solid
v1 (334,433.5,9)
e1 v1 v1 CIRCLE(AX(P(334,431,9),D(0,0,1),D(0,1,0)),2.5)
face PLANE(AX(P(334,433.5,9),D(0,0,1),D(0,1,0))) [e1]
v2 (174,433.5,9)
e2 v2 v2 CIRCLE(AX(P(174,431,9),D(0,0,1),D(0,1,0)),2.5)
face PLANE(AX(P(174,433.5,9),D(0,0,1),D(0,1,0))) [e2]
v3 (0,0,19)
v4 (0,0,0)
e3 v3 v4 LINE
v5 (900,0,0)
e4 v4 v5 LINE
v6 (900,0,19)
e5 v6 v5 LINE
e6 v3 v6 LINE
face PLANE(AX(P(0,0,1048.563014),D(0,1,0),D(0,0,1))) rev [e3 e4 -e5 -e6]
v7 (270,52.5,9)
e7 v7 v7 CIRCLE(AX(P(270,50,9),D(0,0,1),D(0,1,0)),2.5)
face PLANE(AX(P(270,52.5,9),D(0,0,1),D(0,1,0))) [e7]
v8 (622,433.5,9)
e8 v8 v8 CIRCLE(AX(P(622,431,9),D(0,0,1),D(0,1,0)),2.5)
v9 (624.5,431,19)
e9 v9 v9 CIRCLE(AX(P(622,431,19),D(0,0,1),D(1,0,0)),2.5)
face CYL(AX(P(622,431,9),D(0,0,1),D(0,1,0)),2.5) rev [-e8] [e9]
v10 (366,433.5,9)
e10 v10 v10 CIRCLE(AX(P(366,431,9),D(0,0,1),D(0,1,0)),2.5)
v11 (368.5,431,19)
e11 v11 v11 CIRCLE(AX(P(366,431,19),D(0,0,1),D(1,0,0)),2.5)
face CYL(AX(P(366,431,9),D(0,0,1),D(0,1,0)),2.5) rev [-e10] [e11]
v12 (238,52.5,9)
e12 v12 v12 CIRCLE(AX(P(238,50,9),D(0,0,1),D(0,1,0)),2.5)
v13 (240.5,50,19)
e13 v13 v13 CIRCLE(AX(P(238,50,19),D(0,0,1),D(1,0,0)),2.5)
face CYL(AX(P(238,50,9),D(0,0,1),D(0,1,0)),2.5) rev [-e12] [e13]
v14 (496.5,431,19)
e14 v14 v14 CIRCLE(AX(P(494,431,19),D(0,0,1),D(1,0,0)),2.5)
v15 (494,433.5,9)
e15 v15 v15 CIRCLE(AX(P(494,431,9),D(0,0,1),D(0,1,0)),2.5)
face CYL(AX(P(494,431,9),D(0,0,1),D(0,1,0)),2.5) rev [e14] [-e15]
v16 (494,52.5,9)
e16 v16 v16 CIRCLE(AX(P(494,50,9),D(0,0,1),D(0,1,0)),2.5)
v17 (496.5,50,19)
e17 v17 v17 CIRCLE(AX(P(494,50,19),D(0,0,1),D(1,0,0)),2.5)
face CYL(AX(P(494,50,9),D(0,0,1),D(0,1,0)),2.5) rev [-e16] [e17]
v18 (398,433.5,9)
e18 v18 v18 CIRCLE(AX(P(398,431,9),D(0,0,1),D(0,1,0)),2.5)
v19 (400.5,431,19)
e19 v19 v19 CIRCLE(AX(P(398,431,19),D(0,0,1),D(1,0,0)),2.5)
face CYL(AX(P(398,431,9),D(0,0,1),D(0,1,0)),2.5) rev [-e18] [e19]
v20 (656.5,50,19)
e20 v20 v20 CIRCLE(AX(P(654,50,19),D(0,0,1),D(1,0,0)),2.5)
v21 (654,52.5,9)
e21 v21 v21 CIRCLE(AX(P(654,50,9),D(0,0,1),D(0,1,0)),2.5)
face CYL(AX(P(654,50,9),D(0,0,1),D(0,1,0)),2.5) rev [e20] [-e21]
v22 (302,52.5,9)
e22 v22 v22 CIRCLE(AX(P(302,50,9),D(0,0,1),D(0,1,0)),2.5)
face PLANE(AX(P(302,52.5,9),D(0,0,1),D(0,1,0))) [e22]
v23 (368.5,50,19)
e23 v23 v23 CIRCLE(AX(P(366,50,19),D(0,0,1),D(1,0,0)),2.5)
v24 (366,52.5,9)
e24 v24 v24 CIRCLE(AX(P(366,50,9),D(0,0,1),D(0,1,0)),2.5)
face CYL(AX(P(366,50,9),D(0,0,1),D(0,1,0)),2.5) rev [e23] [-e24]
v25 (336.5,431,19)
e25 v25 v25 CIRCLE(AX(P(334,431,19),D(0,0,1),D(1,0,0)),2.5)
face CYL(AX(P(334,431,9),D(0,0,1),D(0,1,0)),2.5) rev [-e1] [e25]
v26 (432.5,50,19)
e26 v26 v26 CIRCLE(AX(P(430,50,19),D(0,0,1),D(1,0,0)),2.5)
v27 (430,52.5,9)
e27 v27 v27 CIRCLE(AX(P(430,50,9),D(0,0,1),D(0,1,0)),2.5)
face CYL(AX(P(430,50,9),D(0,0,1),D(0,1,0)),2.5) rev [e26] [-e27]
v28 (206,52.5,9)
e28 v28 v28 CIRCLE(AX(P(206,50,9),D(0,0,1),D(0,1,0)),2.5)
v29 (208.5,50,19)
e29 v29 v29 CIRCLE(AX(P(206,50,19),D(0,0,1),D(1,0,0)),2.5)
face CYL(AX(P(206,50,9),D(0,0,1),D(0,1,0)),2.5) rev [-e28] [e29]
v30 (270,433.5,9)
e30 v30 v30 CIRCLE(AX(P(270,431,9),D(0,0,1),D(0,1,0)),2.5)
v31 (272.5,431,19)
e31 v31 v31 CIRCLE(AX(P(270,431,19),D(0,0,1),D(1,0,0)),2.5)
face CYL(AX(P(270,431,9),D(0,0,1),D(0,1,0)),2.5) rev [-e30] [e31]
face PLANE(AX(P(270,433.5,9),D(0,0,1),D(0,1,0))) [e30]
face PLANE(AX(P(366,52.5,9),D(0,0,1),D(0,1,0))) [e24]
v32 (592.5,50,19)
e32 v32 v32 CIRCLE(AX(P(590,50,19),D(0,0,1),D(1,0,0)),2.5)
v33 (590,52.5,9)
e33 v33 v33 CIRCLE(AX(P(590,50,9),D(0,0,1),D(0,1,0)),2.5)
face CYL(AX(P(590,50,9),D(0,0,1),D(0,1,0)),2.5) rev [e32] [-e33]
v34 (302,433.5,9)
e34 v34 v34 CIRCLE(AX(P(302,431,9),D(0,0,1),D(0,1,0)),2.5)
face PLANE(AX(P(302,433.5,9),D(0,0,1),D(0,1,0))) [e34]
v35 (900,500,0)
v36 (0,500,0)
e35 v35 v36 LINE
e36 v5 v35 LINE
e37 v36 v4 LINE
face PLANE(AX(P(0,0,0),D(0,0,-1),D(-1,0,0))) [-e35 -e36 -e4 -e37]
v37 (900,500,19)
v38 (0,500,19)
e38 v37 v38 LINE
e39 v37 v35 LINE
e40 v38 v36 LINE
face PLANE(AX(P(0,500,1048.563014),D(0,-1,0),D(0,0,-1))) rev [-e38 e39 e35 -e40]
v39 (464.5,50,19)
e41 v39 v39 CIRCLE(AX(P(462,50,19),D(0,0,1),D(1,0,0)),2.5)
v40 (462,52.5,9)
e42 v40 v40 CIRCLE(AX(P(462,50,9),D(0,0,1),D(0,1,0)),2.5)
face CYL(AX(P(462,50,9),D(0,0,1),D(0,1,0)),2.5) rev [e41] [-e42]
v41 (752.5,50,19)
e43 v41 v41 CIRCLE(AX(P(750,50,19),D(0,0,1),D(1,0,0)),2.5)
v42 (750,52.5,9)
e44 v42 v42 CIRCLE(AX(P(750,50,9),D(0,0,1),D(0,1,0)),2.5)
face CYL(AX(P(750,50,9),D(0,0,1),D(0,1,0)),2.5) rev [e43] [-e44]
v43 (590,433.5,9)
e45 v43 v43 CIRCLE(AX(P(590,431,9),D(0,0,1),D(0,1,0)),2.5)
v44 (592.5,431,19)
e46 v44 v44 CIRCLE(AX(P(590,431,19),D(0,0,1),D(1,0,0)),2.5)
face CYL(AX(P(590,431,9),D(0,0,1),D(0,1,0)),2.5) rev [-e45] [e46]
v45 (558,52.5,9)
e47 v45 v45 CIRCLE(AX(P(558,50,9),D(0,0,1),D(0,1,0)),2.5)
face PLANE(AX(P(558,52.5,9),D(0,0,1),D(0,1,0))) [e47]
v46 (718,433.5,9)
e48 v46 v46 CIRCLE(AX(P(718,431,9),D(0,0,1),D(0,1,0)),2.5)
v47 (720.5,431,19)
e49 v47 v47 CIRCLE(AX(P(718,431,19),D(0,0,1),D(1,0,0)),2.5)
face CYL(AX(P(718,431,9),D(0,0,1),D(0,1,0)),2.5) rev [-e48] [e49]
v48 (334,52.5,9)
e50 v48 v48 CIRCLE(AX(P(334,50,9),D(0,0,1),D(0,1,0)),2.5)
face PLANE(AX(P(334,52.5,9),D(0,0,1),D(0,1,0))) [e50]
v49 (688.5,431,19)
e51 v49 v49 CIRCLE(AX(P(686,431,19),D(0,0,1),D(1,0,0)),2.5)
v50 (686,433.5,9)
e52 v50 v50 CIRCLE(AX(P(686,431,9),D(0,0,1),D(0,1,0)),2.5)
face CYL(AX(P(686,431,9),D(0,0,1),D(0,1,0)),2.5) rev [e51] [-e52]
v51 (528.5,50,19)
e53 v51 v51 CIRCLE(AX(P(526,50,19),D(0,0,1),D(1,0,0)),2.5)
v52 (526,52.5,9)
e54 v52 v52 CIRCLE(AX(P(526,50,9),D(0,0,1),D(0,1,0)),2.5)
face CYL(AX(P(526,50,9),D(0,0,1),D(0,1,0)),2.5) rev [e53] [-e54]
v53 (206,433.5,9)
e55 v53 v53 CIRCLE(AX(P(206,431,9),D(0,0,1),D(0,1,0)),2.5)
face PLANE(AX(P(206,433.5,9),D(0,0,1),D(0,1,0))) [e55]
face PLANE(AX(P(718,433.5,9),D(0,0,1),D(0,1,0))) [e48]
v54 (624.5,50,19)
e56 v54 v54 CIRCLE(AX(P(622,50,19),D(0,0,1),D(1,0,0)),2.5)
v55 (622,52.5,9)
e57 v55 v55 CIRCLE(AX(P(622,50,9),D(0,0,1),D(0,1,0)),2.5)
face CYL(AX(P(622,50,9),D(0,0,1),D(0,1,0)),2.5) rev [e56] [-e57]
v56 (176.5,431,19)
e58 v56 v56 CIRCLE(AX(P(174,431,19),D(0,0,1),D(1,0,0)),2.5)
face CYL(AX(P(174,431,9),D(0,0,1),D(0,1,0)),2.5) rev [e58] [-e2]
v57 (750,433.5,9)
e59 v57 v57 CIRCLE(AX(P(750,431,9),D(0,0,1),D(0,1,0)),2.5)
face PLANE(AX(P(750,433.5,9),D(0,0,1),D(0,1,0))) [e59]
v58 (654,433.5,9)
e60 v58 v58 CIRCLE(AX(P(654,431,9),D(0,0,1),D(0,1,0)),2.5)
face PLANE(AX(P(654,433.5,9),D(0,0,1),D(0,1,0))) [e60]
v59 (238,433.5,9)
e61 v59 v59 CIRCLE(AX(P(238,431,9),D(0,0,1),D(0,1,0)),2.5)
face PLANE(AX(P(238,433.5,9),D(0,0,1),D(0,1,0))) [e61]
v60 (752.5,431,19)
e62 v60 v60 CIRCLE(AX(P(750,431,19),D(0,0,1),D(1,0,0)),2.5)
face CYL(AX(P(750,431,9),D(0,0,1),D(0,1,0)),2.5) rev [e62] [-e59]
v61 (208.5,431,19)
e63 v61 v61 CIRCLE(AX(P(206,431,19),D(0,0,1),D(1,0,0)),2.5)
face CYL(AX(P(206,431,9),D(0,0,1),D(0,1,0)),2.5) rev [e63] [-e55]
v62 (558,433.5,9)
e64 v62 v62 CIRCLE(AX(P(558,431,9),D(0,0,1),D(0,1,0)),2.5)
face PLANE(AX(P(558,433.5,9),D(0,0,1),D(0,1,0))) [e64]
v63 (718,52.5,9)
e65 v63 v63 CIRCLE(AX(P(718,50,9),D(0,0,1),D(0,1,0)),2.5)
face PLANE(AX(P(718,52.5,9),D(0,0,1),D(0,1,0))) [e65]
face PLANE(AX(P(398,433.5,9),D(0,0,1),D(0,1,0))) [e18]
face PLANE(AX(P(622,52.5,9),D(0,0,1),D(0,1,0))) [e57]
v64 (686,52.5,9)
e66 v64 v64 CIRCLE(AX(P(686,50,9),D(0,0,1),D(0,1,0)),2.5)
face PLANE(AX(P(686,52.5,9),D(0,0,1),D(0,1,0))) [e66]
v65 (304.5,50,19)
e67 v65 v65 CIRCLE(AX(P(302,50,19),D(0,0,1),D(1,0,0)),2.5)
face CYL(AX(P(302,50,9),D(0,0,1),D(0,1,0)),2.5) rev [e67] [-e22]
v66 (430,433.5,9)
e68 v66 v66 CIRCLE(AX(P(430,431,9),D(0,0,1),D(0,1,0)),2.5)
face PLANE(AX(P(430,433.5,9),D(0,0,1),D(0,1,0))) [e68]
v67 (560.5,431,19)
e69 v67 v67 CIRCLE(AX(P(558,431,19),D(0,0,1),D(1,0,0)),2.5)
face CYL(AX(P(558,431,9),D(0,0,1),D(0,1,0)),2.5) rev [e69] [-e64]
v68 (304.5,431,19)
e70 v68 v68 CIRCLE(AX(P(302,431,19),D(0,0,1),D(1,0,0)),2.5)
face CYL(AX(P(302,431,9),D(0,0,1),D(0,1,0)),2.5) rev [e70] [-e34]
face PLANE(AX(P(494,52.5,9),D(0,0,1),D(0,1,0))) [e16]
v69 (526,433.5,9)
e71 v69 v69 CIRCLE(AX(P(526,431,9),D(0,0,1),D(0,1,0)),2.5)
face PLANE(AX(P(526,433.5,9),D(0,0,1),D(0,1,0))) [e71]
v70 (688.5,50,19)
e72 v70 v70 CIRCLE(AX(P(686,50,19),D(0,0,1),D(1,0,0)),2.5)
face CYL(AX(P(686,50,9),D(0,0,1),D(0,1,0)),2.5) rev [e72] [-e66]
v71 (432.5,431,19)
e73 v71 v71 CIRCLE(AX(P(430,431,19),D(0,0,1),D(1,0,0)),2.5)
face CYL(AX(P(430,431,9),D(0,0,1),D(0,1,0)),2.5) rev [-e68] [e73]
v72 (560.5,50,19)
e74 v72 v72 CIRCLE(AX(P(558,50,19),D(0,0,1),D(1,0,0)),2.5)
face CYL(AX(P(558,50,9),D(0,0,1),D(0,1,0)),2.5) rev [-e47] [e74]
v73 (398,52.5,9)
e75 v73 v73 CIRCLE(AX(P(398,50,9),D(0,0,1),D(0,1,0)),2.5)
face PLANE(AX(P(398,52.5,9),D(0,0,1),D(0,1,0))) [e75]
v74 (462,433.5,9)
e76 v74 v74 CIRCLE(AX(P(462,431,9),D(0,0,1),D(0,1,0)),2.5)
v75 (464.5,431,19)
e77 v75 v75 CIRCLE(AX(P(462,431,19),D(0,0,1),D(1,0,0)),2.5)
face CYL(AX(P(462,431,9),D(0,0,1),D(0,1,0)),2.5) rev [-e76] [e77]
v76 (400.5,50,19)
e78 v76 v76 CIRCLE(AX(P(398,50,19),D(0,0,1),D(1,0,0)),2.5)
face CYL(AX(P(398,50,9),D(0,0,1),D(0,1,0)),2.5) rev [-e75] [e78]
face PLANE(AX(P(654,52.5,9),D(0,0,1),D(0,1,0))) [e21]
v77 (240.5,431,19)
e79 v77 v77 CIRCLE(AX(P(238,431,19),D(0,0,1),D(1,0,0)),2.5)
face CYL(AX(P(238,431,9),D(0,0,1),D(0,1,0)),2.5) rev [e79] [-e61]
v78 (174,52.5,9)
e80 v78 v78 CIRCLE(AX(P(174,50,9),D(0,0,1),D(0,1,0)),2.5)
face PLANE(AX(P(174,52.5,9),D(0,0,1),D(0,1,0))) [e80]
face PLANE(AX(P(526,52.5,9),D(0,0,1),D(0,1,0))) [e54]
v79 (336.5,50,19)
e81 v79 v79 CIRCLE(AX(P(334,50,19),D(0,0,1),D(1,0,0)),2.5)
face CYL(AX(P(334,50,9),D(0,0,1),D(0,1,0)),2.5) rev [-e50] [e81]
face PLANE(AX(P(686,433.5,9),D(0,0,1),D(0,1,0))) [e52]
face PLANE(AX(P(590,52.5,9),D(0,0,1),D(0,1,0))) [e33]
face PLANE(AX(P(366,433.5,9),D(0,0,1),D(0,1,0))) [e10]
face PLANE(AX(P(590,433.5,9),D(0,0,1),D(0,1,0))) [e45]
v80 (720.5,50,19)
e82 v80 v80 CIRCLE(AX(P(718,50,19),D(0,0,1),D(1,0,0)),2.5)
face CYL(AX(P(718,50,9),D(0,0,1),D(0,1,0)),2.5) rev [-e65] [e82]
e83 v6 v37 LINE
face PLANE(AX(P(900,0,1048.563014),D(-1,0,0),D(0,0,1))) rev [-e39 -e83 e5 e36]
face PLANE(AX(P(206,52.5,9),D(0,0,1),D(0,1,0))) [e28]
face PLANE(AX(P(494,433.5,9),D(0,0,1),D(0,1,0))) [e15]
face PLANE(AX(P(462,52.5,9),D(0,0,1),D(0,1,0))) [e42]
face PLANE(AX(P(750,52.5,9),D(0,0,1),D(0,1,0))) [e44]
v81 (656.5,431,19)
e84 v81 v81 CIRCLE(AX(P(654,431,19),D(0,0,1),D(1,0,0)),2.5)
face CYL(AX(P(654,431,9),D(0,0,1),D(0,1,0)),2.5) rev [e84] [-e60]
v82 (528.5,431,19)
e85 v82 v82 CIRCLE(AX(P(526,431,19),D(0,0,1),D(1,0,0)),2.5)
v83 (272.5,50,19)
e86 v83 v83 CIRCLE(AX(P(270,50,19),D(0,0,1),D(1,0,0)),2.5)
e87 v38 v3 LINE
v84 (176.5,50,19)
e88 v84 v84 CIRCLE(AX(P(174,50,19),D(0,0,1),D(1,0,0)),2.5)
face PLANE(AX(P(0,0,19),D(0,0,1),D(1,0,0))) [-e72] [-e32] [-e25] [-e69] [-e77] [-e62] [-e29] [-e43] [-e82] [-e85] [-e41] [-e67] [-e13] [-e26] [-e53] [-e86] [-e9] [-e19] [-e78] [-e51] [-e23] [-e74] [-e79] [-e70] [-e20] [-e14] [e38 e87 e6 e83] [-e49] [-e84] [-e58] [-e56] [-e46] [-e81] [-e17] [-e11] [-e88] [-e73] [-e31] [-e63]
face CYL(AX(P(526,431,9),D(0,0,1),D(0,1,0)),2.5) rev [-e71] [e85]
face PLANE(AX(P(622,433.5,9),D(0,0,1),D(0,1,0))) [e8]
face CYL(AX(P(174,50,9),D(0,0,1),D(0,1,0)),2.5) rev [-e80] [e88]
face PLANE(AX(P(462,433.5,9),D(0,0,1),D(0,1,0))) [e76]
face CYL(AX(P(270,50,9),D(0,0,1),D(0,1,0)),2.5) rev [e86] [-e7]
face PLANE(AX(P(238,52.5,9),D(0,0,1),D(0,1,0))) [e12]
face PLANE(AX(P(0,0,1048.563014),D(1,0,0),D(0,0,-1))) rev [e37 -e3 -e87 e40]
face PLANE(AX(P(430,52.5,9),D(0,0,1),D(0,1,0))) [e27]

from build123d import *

# Parameters (mm, degrees)
SKETCH1_W                   = 900
SKETCH1_H                   = 500
BOSS_EXTRUDE1_DEPTH         = 19
SWOODBOXDRILLING1_START     = 9
SWOODBOXDRILLING1_OUTLINE_R = 2.5
SWOODBOXDRILLING1_DEPTH     = 10


# Read off the part's stored shape, not the designer's step: SWOODBoxDrilling1
with BuildPart() as part:
    # Sketch1 → Boss-Extrude1 (new body)
    with BuildSketch(Plane.XY):
        with Locations((450, 250)):
            Rectangle(SKETCH1_W, SKETCH1_H)
    extrude(amount=BOSS_EXTRUDE1_DEPTH)

    # SWOODBoxDrilling1 outline → SWOODBoxDrilling1 (cut)
    with BuildSketch(Plane.XY.offset(SWOODBOXDRILLING1_START)):
        with Locations((750, 431)):
            Circle(SWOODBOXDRILLING1_OUTLINE_R)
        with Locations((750, 50)):
            Circle(SWOODBOXDRILLING1_OUTLINE_R)
        with Locations((558, 431)):
            Circle(SWOODBOXDRILLING1_OUTLINE_R)
        with Locations((718, 431)):
            Circle(SWOODBOXDRILLING1_OUTLINE_R)
        with Locations((718, 50)):
            Circle(SWOODBOXDRILLING1_OUTLINE_R)
        with Locations((686, 431)):
            Circle(SWOODBOXDRILLING1_OUTLINE_R)
        with Locations((686, 50)):
            Circle(SWOODBOXDRILLING1_OUTLINE_R)
        with Locations((654, 431)):
            Circle(SWOODBOXDRILLING1_OUTLINE_R)
        with Locations((654, 50)):
            Circle(SWOODBOXDRILLING1_OUTLINE_R)
        with Locations((622, 431)):
            Circle(SWOODBOXDRILLING1_OUTLINE_R)
        with Locations((622, 50)):
            Circle(SWOODBOXDRILLING1_OUTLINE_R)
        with Locations((590, 431)):
            Circle(SWOODBOXDRILLING1_OUTLINE_R)
        with Locations((590, 50)):
            Circle(SWOODBOXDRILLING1_OUTLINE_R)
        with Locations((558, 50)):
            Circle(SWOODBOXDRILLING1_OUTLINE_R)
        with Locations((526, 431)):
            Circle(SWOODBOXDRILLING1_OUTLINE_R)
        with Locations((526, 50)):
            Circle(SWOODBOXDRILLING1_OUTLINE_R)
        with Locations((494, 431)):
            Circle(SWOODBOXDRILLING1_OUTLINE_R)
        with Locations((494, 50)):
            Circle(SWOODBOXDRILLING1_OUTLINE_R)
        with Locations((462, 431)):
            Circle(SWOODBOXDRILLING1_OUTLINE_R)
        with Locations((462, 50)):
            Circle(SWOODBOXDRILLING1_OUTLINE_R)
        with Locations((430, 431)):
            Circle(SWOODBOXDRILLING1_OUTLINE_R)
        with Locations((430, 50)):
            Circle(SWOODBOXDRILLING1_OUTLINE_R)
        with Locations((398, 431)):
            Circle(SWOODBOXDRILLING1_OUTLINE_R)
        with Locations((398, 50)):
            Circle(SWOODBOXDRILLING1_OUTLINE_R)
        with Locations((366, 431)):
            Circle(SWOODBOXDRILLING1_OUTLINE_R)
        with Locations((366, 50)):
            Circle(SWOODBOXDRILLING1_OUTLINE_R)
        with Locations((334, 431)):
            Circle(SWOODBOXDRILLING1_OUTLINE_R)
        with Locations((334, 50)):
            Circle(SWOODBOXDRILLING1_OUTLINE_R)
        with Locations((302, 431)):
            Circle(SWOODBOXDRILLING1_OUTLINE_R)
        with Locations((302, 50)):
            Circle(SWOODBOXDRILLING1_OUTLINE_R)
        with Locations((270, 431)):
            Circle(SWOODBOXDRILLING1_OUTLINE_R)
        with Locations((270, 50)):
            Circle(SWOODBOXDRILLING1_OUTLINE_R)
        with Locations((238, 431)):
            Circle(SWOODBOXDRILLING1_OUTLINE_R)
        with Locations((238, 50)):
            Circle(SWOODBOXDRILLING1_OUTLINE_R)
        with Locations((206, 431)):
            Circle(SWOODBOXDRILLING1_OUTLINE_R)
        with Locations((206, 50)):
            Circle(SWOODBOXDRILLING1_OUTLINE_R)
        with Locations((174, 431)):
            Circle(SWOODBOXDRILLING1_OUTLINE_R)
        with Locations((174, 50)):
            Circle(SWOODBOXDRILLING1_OUTLINE_R)
    extrude(amount=SWOODBOXDRILLING1_DEPTH, mode=Mode.SUBTRACT)


solid = part.part
